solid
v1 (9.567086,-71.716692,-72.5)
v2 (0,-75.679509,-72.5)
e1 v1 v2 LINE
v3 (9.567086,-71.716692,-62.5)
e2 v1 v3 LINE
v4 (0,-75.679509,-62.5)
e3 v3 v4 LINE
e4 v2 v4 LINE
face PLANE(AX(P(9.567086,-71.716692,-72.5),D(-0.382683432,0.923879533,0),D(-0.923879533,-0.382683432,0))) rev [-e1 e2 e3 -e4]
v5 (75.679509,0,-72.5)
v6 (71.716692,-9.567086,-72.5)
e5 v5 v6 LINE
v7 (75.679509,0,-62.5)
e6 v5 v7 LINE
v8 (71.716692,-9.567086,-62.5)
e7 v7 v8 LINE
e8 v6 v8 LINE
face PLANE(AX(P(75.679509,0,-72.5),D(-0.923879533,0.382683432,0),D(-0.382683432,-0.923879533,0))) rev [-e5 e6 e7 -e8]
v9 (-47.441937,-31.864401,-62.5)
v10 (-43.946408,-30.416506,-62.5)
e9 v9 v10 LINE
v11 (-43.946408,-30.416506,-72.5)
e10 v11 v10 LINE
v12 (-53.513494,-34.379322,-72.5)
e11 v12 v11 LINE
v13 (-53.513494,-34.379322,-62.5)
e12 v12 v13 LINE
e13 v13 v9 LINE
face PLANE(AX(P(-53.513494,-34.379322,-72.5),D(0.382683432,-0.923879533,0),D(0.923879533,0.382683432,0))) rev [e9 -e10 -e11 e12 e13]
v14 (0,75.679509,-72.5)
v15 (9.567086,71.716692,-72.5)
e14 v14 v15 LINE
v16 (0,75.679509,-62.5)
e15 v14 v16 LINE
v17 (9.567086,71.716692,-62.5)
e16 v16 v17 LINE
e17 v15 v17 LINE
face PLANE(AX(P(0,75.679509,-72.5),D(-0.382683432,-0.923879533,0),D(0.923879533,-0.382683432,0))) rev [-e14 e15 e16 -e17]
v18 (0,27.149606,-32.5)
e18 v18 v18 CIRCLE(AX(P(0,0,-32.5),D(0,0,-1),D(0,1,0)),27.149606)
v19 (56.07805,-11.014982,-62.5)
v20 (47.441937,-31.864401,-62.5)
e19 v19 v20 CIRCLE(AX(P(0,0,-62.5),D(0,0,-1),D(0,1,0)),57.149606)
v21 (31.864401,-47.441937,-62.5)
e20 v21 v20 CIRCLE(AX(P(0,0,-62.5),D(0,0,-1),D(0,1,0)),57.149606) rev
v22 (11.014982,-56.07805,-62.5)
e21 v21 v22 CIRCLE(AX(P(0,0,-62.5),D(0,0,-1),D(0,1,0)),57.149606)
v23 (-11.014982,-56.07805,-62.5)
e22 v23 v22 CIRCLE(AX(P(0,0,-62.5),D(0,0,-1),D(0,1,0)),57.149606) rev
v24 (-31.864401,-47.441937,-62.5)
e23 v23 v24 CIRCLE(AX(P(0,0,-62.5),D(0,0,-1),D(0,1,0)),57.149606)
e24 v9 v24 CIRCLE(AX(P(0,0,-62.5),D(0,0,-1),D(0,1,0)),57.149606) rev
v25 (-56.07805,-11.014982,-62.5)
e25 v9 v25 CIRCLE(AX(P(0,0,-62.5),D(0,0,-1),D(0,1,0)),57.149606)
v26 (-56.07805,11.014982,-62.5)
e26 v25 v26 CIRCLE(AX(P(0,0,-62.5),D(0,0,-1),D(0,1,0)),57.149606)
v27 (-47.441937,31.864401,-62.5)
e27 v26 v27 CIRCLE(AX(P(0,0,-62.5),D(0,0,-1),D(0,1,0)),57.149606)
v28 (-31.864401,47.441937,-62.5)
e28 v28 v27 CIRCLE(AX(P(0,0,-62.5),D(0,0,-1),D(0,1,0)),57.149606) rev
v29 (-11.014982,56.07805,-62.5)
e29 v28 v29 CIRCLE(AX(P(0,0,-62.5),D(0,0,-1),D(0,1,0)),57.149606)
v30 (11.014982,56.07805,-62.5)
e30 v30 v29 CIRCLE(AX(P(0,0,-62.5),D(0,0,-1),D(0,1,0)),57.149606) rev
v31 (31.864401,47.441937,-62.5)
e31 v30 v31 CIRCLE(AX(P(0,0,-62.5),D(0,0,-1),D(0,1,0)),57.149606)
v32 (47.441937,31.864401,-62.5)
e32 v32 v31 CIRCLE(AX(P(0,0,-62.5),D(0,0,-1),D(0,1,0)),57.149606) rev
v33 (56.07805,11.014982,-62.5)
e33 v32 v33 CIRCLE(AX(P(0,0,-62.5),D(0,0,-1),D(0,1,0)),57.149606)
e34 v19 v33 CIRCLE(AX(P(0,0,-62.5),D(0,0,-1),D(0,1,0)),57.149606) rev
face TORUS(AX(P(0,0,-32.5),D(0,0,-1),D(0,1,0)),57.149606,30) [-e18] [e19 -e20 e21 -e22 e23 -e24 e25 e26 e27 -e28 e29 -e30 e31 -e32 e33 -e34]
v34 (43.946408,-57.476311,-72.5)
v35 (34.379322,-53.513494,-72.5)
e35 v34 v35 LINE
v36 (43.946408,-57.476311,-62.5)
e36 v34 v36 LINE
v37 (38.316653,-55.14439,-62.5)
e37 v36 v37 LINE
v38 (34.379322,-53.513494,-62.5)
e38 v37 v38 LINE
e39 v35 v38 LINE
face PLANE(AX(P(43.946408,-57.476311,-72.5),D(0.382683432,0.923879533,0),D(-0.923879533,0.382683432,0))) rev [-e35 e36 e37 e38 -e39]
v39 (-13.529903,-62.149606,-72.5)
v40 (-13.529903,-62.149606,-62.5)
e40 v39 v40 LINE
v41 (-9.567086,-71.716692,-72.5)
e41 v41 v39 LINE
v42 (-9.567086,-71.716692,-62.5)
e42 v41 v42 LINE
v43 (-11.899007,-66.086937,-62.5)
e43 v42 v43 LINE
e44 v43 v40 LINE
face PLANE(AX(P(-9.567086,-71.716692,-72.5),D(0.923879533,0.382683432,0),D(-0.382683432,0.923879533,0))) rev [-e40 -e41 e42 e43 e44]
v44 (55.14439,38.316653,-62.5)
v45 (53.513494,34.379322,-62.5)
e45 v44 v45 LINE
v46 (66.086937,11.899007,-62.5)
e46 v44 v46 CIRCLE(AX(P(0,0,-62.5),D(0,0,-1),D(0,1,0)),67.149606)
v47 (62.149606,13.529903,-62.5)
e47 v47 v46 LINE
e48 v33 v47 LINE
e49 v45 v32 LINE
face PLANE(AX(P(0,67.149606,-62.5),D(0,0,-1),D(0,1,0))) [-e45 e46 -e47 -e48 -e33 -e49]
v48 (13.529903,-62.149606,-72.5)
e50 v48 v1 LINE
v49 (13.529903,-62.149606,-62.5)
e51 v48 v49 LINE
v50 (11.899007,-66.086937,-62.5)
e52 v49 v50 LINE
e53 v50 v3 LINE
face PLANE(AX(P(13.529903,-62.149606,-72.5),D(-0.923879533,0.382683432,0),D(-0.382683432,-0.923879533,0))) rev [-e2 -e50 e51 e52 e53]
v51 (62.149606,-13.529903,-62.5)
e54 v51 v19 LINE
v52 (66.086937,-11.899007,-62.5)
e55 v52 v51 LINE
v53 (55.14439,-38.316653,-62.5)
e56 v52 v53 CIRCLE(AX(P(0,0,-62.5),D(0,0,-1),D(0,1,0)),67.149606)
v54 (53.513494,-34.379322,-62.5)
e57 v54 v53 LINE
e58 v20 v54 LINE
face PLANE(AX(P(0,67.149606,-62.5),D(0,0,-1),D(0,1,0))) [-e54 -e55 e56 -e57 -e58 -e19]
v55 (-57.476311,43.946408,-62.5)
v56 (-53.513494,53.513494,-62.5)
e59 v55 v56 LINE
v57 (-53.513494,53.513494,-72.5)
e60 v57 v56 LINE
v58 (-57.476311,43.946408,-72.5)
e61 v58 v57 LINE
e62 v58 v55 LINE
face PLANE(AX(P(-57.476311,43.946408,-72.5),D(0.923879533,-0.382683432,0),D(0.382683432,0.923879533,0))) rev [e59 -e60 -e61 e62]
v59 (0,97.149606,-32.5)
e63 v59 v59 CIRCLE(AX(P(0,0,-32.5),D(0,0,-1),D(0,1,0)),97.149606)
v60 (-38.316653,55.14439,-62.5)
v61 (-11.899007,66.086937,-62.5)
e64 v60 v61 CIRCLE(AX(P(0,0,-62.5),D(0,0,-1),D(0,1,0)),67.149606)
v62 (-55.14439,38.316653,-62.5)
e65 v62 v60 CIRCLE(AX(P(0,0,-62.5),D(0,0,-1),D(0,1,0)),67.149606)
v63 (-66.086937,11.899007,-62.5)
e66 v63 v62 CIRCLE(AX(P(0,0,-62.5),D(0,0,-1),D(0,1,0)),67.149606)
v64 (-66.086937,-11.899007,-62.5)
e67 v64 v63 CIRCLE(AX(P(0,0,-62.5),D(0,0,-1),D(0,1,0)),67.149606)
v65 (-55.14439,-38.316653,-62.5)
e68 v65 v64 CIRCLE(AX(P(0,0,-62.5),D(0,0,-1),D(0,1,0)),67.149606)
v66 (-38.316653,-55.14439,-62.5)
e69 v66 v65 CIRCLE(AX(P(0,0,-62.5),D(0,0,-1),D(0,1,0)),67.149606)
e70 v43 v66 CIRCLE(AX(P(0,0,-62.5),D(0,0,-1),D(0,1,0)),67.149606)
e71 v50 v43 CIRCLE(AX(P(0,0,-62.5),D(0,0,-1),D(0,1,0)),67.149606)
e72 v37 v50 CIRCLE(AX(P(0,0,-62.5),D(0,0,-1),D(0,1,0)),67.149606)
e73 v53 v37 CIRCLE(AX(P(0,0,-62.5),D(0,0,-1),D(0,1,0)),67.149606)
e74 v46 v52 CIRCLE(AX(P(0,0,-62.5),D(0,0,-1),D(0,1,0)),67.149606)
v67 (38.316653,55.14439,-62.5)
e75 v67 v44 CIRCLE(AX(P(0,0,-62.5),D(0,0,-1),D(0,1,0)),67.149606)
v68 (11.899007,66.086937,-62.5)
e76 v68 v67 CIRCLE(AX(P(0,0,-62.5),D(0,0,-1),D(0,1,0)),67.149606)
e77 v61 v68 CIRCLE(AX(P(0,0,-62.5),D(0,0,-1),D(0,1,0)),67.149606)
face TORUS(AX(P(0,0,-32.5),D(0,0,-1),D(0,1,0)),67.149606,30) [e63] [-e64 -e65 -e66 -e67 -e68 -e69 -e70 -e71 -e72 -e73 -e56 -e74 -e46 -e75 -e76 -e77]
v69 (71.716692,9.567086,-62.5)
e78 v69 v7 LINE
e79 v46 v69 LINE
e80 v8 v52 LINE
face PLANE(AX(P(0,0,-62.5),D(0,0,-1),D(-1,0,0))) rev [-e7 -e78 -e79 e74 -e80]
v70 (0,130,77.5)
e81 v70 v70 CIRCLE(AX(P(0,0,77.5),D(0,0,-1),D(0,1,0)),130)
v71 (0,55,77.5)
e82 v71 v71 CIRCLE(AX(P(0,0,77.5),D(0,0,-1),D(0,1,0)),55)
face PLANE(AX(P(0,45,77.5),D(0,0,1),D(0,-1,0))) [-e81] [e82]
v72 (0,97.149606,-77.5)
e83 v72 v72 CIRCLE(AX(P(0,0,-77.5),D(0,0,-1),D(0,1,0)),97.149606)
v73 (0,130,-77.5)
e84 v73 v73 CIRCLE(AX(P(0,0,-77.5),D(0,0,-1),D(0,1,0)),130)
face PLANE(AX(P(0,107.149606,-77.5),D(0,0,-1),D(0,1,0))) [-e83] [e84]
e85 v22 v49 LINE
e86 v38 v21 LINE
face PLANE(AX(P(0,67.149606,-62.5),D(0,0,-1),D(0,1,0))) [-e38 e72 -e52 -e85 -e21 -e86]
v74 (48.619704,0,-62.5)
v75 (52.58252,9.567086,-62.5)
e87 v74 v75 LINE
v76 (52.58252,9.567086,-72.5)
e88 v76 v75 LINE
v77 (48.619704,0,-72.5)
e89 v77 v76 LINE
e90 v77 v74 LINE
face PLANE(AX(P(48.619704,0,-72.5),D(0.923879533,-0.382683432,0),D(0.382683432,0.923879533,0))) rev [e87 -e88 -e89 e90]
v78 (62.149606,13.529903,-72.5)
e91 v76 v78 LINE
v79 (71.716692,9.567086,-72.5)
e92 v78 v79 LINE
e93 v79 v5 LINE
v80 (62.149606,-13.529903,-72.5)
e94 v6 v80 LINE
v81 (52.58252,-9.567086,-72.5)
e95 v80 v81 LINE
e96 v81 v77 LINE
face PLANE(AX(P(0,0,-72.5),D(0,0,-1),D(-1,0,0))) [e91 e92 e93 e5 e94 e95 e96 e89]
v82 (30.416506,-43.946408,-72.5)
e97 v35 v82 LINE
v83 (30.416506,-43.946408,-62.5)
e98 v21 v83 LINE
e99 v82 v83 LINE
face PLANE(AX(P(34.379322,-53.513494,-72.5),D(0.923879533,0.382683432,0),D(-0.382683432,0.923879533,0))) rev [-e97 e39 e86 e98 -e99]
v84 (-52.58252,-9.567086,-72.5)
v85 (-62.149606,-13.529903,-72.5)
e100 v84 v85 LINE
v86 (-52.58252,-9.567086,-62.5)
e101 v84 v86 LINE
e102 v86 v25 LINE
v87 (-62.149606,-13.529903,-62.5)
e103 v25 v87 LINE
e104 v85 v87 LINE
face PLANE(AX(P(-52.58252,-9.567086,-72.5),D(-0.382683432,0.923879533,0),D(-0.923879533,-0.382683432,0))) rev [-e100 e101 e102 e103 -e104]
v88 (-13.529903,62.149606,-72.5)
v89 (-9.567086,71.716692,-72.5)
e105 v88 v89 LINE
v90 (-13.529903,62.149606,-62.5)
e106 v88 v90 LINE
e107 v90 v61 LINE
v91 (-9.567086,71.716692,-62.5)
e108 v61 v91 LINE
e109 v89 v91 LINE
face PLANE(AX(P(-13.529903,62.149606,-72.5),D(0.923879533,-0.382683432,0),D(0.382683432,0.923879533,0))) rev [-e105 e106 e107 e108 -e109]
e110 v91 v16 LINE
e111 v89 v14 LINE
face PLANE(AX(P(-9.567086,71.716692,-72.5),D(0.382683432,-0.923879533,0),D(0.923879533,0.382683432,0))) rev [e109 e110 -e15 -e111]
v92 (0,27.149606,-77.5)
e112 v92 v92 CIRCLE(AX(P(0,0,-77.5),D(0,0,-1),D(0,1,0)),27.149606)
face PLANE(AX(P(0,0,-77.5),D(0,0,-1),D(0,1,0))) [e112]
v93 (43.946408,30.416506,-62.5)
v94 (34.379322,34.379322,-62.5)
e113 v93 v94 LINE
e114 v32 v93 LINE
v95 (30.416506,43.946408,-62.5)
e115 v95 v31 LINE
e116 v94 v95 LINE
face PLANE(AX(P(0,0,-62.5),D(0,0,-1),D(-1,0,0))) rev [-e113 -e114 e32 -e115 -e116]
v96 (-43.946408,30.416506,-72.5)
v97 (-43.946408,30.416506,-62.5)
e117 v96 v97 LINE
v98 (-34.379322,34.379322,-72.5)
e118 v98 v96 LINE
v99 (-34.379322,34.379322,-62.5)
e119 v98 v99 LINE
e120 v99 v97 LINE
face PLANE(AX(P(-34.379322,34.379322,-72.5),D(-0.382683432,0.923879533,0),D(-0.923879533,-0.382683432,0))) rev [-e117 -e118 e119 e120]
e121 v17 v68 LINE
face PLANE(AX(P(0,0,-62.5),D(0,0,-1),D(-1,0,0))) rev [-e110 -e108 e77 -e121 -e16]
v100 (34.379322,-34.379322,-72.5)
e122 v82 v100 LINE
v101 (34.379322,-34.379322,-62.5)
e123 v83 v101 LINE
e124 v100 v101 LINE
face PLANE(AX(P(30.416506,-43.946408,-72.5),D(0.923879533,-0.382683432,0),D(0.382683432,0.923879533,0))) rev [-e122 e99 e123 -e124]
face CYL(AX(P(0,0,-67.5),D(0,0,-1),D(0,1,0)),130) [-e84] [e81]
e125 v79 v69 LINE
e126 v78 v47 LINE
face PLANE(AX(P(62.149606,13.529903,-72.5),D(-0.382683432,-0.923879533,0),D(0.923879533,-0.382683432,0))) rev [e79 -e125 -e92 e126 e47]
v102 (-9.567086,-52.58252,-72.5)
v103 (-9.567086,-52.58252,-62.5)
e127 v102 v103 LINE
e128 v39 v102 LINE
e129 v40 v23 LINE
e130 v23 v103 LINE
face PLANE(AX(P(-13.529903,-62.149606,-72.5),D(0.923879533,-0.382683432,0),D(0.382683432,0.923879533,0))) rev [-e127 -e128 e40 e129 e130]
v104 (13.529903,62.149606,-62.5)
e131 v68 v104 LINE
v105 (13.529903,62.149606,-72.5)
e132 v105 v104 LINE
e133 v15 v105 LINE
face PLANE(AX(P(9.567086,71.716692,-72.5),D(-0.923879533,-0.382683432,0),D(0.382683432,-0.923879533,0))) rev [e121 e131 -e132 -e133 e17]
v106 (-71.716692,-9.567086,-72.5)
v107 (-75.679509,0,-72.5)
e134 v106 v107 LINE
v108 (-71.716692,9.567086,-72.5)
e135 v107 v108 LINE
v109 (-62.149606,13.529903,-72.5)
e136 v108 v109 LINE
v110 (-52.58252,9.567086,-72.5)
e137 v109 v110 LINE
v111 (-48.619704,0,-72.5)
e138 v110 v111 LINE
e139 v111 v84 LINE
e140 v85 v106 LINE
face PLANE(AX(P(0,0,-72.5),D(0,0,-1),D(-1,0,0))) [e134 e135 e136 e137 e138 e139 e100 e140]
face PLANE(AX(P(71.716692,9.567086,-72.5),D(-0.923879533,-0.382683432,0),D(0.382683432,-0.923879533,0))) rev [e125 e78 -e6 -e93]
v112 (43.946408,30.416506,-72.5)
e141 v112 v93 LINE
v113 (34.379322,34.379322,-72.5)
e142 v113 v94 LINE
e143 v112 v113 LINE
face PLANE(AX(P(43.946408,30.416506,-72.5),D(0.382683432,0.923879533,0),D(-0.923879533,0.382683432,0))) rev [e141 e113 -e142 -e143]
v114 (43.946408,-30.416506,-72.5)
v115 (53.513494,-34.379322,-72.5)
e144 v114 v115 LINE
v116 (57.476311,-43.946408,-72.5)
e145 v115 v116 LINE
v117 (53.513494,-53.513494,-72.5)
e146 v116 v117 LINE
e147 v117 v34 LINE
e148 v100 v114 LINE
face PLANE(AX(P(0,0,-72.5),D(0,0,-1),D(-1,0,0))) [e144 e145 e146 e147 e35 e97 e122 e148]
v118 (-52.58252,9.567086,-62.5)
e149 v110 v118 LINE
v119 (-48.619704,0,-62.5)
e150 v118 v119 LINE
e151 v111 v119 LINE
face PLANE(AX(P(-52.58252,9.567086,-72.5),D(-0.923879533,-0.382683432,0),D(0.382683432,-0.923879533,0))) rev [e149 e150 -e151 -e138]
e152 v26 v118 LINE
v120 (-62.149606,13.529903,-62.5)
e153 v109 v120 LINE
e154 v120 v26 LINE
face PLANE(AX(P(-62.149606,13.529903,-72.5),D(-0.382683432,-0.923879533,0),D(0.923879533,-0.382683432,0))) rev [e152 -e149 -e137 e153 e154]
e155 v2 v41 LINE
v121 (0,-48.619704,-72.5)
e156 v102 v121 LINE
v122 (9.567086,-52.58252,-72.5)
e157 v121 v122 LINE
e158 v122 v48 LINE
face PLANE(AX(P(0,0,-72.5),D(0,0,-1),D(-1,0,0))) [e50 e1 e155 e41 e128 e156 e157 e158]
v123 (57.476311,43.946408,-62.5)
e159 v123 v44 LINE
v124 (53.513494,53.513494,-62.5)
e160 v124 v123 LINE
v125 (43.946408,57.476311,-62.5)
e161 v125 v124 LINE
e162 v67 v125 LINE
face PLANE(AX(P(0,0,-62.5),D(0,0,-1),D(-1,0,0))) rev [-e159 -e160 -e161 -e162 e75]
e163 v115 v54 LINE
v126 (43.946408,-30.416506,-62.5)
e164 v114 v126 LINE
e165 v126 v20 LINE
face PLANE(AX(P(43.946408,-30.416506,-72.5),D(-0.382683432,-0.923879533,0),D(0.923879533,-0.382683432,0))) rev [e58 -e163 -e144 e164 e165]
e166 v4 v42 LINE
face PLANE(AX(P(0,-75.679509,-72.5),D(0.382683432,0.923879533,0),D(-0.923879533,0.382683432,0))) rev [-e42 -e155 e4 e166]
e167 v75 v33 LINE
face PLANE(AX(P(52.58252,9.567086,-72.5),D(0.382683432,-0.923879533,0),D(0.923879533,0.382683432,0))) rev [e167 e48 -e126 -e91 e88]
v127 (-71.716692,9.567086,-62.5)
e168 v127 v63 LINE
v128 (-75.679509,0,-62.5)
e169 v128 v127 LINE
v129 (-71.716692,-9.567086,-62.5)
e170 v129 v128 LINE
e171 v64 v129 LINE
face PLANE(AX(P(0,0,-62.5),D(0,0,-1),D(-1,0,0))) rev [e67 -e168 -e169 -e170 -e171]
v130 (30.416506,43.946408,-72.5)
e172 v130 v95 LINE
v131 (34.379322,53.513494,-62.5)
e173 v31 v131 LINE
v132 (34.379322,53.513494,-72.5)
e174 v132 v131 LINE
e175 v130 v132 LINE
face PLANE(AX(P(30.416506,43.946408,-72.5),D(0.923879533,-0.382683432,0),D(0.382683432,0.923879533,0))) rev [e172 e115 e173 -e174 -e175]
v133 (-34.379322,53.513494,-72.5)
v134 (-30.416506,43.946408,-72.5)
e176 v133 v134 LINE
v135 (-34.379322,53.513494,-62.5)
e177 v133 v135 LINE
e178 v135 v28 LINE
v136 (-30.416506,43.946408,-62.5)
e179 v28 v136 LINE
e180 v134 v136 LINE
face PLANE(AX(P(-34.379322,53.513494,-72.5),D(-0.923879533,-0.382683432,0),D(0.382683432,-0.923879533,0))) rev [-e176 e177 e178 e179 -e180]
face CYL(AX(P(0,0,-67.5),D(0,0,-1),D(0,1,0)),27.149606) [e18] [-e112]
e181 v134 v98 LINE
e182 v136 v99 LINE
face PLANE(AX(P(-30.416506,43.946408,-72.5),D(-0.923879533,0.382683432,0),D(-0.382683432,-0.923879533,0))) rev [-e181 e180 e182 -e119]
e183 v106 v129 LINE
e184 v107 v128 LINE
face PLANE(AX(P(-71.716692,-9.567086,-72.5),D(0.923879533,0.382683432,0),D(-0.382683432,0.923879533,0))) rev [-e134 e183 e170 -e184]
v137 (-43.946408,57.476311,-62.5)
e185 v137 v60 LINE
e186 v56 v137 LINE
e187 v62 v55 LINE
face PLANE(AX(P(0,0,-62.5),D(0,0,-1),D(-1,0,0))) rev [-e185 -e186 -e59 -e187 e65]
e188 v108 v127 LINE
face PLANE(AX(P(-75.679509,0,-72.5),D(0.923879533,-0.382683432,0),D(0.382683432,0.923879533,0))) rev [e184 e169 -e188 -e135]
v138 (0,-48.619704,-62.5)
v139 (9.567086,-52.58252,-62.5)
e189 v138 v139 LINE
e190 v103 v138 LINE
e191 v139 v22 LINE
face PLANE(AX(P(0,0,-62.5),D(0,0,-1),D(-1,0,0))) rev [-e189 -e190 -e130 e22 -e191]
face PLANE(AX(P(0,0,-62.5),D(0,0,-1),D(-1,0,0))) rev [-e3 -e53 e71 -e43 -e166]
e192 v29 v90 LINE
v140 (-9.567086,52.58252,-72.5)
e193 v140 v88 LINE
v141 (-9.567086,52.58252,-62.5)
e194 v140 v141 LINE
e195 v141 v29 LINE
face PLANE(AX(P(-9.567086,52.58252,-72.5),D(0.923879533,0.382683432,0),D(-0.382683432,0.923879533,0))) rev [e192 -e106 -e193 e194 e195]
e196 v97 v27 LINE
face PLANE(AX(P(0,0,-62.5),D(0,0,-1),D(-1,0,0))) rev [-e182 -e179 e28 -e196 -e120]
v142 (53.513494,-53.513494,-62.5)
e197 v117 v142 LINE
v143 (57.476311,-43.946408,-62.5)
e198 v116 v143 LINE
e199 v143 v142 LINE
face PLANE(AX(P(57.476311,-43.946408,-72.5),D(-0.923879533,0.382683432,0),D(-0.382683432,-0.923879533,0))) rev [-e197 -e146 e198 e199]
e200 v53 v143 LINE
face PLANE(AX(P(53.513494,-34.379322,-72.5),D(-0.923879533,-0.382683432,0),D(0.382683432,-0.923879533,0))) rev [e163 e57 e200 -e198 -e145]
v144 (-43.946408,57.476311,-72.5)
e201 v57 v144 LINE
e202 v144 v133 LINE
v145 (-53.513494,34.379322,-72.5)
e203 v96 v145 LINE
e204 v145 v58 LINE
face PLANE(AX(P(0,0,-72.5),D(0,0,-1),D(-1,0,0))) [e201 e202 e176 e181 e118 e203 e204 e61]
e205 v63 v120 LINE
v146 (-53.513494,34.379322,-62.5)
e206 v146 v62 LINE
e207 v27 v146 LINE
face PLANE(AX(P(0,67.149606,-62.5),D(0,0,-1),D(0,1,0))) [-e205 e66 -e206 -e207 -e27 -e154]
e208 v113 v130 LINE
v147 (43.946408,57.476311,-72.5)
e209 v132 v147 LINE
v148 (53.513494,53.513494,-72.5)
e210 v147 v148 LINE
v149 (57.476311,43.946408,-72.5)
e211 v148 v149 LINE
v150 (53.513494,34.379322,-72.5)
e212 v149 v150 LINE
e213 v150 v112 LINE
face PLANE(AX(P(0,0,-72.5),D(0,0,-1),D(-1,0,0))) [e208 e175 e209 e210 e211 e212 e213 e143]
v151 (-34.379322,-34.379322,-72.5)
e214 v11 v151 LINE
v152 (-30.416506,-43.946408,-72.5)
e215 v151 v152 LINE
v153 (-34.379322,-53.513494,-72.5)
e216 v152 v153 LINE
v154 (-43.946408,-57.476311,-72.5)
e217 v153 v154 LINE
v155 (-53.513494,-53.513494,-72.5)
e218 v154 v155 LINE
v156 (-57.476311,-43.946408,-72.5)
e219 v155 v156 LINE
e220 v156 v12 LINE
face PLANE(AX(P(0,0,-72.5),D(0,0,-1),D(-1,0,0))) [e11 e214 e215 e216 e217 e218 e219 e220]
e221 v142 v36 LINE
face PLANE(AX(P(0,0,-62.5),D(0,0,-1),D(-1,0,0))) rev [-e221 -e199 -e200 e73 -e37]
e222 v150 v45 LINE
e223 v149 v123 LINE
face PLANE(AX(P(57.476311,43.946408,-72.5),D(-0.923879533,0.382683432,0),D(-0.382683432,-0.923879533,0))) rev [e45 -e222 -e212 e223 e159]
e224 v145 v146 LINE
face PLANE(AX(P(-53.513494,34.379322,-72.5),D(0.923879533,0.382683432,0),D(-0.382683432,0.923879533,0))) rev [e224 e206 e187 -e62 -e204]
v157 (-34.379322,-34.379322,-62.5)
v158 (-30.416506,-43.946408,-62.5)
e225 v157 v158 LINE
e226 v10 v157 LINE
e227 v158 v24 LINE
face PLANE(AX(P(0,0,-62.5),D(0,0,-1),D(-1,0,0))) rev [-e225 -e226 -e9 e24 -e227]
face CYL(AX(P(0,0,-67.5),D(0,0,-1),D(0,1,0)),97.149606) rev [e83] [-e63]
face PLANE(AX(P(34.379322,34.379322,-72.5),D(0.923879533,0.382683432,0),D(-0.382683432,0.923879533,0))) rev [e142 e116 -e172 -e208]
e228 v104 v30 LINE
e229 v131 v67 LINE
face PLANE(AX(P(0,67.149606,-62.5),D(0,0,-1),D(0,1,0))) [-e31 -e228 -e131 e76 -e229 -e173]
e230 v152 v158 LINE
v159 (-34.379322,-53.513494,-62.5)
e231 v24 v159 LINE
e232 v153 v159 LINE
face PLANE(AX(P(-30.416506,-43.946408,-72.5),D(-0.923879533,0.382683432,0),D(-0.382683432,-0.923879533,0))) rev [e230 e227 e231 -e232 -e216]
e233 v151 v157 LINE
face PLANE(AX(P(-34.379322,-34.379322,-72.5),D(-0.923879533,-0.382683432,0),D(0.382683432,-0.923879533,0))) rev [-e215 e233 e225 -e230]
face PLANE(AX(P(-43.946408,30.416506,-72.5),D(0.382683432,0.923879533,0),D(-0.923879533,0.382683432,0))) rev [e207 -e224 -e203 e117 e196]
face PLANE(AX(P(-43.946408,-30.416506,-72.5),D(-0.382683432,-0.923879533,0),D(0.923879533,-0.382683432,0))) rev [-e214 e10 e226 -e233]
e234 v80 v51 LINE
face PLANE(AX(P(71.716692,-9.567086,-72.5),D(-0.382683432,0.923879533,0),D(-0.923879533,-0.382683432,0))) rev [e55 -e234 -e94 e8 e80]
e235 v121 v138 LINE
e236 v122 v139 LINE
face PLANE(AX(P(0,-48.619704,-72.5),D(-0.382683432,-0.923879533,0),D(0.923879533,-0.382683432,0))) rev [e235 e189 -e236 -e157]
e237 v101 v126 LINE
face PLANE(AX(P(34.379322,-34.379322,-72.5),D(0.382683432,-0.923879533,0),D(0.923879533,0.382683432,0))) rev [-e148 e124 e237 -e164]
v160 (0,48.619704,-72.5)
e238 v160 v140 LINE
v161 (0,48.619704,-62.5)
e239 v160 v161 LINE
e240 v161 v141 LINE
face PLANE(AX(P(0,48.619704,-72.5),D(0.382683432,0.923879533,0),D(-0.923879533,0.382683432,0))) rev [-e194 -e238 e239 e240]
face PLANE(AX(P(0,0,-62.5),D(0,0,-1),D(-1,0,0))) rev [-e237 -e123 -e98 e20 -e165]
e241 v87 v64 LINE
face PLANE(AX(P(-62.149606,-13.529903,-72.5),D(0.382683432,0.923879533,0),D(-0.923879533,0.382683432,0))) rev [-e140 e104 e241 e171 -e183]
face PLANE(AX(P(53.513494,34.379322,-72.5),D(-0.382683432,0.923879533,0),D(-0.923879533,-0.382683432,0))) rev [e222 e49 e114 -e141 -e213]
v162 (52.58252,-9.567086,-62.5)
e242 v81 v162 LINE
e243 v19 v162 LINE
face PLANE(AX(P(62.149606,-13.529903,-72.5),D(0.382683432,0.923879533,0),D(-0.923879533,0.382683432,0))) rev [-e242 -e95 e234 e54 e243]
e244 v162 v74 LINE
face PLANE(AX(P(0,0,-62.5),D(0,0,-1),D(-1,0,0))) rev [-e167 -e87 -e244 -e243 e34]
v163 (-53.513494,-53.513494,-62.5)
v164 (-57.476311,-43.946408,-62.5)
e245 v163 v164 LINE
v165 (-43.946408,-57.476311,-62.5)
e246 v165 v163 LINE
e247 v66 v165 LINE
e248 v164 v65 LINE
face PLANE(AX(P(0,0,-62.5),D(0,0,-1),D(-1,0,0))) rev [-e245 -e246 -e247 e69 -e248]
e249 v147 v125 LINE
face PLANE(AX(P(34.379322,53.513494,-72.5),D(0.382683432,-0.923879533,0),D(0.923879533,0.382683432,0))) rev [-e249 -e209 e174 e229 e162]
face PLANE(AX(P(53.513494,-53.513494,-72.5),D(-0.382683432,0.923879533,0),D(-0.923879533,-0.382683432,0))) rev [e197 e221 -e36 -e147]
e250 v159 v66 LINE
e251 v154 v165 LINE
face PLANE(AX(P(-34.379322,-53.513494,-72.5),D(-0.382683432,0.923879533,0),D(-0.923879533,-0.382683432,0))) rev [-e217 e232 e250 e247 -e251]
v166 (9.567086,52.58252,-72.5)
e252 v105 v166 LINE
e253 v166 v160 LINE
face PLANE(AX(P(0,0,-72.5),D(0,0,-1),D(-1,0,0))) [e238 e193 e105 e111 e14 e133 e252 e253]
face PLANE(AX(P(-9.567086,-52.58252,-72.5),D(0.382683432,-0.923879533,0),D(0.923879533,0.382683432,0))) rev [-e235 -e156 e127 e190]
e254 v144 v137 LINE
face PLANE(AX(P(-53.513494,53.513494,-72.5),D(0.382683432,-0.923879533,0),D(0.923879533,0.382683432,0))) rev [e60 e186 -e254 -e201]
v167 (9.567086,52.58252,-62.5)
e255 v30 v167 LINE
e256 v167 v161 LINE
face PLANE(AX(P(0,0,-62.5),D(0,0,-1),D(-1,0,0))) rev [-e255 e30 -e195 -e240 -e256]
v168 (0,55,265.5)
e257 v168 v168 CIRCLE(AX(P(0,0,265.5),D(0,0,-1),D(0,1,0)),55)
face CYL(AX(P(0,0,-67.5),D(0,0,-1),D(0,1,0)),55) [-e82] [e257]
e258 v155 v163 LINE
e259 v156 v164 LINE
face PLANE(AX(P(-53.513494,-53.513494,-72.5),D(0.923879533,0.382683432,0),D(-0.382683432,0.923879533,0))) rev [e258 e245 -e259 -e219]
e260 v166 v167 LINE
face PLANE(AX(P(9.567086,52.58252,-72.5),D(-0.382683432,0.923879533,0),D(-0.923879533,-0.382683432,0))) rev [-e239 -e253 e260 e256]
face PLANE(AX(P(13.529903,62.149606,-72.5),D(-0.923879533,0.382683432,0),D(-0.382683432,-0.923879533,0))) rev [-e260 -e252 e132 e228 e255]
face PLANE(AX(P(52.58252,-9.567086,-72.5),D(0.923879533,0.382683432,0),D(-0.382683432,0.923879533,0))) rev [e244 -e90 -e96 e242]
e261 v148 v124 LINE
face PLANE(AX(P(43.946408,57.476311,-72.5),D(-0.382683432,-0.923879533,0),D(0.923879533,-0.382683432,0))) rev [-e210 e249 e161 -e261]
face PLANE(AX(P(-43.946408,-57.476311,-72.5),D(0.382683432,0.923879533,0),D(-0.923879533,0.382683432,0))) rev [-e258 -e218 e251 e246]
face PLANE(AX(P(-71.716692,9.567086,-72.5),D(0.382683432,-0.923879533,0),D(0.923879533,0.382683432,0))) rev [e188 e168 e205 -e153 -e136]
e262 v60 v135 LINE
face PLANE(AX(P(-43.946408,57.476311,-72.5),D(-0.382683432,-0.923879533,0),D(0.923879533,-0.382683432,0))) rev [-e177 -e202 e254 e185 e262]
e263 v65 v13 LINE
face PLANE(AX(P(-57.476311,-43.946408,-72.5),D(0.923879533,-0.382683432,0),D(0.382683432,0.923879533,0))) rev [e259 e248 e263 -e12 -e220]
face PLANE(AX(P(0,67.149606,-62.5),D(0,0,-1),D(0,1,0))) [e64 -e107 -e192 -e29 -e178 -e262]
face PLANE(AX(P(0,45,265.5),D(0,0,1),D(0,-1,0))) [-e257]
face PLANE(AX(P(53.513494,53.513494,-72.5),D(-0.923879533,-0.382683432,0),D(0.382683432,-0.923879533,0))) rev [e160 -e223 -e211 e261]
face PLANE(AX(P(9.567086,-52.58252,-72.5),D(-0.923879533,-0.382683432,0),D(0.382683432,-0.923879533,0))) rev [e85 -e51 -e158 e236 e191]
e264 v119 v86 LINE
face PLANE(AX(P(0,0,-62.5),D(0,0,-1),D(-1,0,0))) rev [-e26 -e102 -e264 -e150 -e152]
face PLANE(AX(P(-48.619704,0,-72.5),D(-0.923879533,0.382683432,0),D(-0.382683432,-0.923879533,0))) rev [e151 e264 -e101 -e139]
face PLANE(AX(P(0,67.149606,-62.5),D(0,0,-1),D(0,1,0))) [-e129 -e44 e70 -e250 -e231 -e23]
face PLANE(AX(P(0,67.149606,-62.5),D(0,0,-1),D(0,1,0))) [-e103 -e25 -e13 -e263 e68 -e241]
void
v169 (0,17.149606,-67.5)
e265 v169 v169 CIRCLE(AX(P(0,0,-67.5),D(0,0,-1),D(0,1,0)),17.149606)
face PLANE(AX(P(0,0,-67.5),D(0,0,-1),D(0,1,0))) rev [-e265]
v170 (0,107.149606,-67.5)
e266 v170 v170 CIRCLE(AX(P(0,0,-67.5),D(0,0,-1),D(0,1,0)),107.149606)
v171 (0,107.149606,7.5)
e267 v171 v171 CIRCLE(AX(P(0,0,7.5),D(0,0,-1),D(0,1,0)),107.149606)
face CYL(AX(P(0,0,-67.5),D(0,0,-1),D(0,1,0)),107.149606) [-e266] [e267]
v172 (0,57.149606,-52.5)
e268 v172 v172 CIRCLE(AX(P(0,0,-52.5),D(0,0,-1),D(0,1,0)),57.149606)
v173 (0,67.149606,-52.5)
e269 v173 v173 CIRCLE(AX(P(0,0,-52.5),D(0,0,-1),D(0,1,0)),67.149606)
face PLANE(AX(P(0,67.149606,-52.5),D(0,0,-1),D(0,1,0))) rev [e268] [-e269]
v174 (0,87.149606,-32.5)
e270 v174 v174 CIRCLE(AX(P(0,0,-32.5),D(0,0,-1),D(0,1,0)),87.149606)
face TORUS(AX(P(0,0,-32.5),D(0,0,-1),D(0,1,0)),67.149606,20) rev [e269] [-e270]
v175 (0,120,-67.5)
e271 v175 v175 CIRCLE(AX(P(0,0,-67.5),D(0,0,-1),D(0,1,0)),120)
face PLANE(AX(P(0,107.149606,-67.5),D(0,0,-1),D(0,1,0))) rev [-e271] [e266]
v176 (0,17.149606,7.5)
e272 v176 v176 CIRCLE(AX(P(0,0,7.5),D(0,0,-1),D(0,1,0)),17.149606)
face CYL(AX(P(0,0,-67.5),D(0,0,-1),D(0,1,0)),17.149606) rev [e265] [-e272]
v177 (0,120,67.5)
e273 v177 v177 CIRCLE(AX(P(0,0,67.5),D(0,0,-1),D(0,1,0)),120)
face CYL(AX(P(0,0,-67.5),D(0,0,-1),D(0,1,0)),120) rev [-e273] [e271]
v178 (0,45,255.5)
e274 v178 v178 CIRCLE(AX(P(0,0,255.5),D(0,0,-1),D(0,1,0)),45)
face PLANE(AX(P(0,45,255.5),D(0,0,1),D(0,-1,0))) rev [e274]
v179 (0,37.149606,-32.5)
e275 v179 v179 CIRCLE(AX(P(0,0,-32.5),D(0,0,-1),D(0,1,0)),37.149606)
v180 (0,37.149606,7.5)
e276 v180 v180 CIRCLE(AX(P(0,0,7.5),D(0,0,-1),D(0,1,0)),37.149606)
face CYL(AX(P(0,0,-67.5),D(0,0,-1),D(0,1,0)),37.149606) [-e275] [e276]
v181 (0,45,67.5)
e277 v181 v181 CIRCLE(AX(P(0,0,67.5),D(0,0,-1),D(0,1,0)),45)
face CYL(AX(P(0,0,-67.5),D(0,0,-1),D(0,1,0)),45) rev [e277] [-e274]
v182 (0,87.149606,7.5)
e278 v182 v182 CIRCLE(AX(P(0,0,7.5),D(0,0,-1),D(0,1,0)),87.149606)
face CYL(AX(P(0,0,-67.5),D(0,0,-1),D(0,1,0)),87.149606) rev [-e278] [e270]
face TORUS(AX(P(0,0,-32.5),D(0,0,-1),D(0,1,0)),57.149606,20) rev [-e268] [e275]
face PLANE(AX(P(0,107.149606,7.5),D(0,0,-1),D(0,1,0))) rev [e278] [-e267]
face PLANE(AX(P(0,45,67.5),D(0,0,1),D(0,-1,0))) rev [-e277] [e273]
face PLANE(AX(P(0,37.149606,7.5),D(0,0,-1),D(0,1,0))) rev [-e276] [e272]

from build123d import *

# Parameters (mm, degrees)
Y_KSEKLIK_EKSTR_ZYON1_DEPTH = 10


# Read off the part's stored shape, not the designer's step: Döndür-İnce1
with BuildPart() as part:
    # Döndür-İnce1 outline → Döndür-İnce1 (revolve)
    with BuildSketch(Plane.XZ):
        with BuildLine():
            Line((0, 265.5), (0, 255.5))
            Line((0, 255.5), (45, 255.5))
            Line((45, 255.5), (45, 67.5))
            Line((45, 67.5), (120, 67.5))
            Line((120, 67.5), (120, -67.5))
            Line((120, -67.5), (107.149606299, -67.5))
            Line((107.149606299, -67.5), (107.149606299, 7.5))
            Line((107.149606299, 7.5), (87.149606299, 7.5))
            Line((87.149606299, 7.5), (87.149606299, -32.5))
            ThreePointArc((87.149606299, -32.5), (81.291741923, -46.642135624), (67.149606299, -52.5))
            Line((67.149606299, -52.5), (57.149606299, -52.5))
            ThreePointArc((57.149606299, -52.5), (43.007470675, -46.642135624), (37.149606299, -32.5))
            Line((37.149606299, -32.5), (37.149606299, 7.5))
            Line((37.149606299, 7.5), (17.149606299, 7.5))
            Line((17.149606299, 7.5), (17.149606299, -67.5))
            Line((17.149606299, -67.5), (0, -67.5))
            Line((0, -67.5), (0, -77.5))
            Line((0, -77.5), (27.149606299, -77.5))
            Line((27.149606299, -77.5), (27.149606299, -32.5))
            ThreePointArc((27.149606299, -32.5), (35.936402864, -53.713203435), (57.149606299, -62.5))
            Line((57.149606299, -62.5), (67.149606299, -62.5))
            ThreePointArc((67.149606299, -62.5), (88.362809735, -53.713203436), (97.149606299, -32.5))
            Line((97.149606299, -32.5), (97.149606299, -77.5))
            Line((97.149606299, -77.5), (130, -77.5))
            Line((130, -77.5), (130, 77.5))
            Line((130, 77.5), (55, 77.5))
            Line((55, 77.5), (55, 265.5))
            Line((55, 265.5), (0, 265.5))
        make_face()
    revolve(axis=Axis((0, 0, 0), (0, 0, 1)))

    # Çizim2 → Yükseklik-Ekstrüzyon1 (add)
    with BuildSketch(Plane(origin=(0, 0, -62.5), x_dir=(-1, 0, 0), z_dir=(0, 0, -1))):
        Polygon((62.149606299, -13.529902504), (71.716692108, -9.567085809), (75.679508803, 0), (71.716692108, 9.567085809), (62.149606299, 13.529902504), (52.58252049, 9.567085809), (48.619703796, 0), (52.58252049, -9.567085809), align=None)
        Polygon((53.513493871, -53.513493871), (57.476310566, -43.946408062), (53.513493871, -34.379322253), (43.946408062, -30.416505559), (34.379322253, -34.379322253), (30.416505559, -43.946408062), (34.379322253, -53.513493871), (43.946408062, -57.476310566), align=None)
        Polygon((0, -75.679508803), (9.567085809, -71.716692108), (13.529902504, -62.149606299), (9.567085809, -52.58252049), (0, -48.619703796), (-9.567085809, -52.58252049), (-13.529902504, -62.149606299), (-9.567085809, -71.716692108), align=None)
        Polygon((-53.513493871, -53.513493871), (-43.946408062, -57.476310566), (-34.379322253, -53.513493871), (-30.416505559, -43.946408062), (-34.379322253, -34.379322253), (-43.946408062, -30.416505559), (-53.513493871, -34.379322253), (-57.476310566, -43.946408062), align=None)
        Polygon((-75.679508803, 0), (-71.716692108, -9.567085809), (-62.149606299, -13.529902504), (-52.58252049, -9.567085809), (-48.619703796, 0), (-52.58252049, 9.567085809), (-62.149606299, 13.529902504), (-71.716692108, 9.567085809), align=None)
        Polygon((-53.513493871, 53.513493871), (-57.476310566, 43.946408062), (-53.513493871, 34.379322253), (-43.946408062, 30.416505559), (-34.379322253, 34.379322253), (-30.416505559, 43.946408062), (-34.379322253, 53.513493871), (-43.946408062, 57.476310566), align=None)
        Polygon((0, 75.679508803), (-9.567085809, 71.716692108), (-13.529902504, 62.149606299), (-9.567085809, 52.58252049), (0, 48.619703796), (9.567085809, 52.58252049), (13.529902504, 62.149606299), (9.567085809, 71.716692108), align=None)
        Polygon((53.513493871, 53.513493871), (43.946408062, 57.476310566), (34.379322253, 53.513493871), (30.416505559, 43.946408062), (34.379322253, 34.379322253), (43.946408062, 30.416505559), (53.513493871, 34.379322253), (57.476310566, 43.946408062), align=None)
    extrude(amount=Y_KSEKLIK_EKSTR_ZYON1_DEPTH)


solid = part.part
